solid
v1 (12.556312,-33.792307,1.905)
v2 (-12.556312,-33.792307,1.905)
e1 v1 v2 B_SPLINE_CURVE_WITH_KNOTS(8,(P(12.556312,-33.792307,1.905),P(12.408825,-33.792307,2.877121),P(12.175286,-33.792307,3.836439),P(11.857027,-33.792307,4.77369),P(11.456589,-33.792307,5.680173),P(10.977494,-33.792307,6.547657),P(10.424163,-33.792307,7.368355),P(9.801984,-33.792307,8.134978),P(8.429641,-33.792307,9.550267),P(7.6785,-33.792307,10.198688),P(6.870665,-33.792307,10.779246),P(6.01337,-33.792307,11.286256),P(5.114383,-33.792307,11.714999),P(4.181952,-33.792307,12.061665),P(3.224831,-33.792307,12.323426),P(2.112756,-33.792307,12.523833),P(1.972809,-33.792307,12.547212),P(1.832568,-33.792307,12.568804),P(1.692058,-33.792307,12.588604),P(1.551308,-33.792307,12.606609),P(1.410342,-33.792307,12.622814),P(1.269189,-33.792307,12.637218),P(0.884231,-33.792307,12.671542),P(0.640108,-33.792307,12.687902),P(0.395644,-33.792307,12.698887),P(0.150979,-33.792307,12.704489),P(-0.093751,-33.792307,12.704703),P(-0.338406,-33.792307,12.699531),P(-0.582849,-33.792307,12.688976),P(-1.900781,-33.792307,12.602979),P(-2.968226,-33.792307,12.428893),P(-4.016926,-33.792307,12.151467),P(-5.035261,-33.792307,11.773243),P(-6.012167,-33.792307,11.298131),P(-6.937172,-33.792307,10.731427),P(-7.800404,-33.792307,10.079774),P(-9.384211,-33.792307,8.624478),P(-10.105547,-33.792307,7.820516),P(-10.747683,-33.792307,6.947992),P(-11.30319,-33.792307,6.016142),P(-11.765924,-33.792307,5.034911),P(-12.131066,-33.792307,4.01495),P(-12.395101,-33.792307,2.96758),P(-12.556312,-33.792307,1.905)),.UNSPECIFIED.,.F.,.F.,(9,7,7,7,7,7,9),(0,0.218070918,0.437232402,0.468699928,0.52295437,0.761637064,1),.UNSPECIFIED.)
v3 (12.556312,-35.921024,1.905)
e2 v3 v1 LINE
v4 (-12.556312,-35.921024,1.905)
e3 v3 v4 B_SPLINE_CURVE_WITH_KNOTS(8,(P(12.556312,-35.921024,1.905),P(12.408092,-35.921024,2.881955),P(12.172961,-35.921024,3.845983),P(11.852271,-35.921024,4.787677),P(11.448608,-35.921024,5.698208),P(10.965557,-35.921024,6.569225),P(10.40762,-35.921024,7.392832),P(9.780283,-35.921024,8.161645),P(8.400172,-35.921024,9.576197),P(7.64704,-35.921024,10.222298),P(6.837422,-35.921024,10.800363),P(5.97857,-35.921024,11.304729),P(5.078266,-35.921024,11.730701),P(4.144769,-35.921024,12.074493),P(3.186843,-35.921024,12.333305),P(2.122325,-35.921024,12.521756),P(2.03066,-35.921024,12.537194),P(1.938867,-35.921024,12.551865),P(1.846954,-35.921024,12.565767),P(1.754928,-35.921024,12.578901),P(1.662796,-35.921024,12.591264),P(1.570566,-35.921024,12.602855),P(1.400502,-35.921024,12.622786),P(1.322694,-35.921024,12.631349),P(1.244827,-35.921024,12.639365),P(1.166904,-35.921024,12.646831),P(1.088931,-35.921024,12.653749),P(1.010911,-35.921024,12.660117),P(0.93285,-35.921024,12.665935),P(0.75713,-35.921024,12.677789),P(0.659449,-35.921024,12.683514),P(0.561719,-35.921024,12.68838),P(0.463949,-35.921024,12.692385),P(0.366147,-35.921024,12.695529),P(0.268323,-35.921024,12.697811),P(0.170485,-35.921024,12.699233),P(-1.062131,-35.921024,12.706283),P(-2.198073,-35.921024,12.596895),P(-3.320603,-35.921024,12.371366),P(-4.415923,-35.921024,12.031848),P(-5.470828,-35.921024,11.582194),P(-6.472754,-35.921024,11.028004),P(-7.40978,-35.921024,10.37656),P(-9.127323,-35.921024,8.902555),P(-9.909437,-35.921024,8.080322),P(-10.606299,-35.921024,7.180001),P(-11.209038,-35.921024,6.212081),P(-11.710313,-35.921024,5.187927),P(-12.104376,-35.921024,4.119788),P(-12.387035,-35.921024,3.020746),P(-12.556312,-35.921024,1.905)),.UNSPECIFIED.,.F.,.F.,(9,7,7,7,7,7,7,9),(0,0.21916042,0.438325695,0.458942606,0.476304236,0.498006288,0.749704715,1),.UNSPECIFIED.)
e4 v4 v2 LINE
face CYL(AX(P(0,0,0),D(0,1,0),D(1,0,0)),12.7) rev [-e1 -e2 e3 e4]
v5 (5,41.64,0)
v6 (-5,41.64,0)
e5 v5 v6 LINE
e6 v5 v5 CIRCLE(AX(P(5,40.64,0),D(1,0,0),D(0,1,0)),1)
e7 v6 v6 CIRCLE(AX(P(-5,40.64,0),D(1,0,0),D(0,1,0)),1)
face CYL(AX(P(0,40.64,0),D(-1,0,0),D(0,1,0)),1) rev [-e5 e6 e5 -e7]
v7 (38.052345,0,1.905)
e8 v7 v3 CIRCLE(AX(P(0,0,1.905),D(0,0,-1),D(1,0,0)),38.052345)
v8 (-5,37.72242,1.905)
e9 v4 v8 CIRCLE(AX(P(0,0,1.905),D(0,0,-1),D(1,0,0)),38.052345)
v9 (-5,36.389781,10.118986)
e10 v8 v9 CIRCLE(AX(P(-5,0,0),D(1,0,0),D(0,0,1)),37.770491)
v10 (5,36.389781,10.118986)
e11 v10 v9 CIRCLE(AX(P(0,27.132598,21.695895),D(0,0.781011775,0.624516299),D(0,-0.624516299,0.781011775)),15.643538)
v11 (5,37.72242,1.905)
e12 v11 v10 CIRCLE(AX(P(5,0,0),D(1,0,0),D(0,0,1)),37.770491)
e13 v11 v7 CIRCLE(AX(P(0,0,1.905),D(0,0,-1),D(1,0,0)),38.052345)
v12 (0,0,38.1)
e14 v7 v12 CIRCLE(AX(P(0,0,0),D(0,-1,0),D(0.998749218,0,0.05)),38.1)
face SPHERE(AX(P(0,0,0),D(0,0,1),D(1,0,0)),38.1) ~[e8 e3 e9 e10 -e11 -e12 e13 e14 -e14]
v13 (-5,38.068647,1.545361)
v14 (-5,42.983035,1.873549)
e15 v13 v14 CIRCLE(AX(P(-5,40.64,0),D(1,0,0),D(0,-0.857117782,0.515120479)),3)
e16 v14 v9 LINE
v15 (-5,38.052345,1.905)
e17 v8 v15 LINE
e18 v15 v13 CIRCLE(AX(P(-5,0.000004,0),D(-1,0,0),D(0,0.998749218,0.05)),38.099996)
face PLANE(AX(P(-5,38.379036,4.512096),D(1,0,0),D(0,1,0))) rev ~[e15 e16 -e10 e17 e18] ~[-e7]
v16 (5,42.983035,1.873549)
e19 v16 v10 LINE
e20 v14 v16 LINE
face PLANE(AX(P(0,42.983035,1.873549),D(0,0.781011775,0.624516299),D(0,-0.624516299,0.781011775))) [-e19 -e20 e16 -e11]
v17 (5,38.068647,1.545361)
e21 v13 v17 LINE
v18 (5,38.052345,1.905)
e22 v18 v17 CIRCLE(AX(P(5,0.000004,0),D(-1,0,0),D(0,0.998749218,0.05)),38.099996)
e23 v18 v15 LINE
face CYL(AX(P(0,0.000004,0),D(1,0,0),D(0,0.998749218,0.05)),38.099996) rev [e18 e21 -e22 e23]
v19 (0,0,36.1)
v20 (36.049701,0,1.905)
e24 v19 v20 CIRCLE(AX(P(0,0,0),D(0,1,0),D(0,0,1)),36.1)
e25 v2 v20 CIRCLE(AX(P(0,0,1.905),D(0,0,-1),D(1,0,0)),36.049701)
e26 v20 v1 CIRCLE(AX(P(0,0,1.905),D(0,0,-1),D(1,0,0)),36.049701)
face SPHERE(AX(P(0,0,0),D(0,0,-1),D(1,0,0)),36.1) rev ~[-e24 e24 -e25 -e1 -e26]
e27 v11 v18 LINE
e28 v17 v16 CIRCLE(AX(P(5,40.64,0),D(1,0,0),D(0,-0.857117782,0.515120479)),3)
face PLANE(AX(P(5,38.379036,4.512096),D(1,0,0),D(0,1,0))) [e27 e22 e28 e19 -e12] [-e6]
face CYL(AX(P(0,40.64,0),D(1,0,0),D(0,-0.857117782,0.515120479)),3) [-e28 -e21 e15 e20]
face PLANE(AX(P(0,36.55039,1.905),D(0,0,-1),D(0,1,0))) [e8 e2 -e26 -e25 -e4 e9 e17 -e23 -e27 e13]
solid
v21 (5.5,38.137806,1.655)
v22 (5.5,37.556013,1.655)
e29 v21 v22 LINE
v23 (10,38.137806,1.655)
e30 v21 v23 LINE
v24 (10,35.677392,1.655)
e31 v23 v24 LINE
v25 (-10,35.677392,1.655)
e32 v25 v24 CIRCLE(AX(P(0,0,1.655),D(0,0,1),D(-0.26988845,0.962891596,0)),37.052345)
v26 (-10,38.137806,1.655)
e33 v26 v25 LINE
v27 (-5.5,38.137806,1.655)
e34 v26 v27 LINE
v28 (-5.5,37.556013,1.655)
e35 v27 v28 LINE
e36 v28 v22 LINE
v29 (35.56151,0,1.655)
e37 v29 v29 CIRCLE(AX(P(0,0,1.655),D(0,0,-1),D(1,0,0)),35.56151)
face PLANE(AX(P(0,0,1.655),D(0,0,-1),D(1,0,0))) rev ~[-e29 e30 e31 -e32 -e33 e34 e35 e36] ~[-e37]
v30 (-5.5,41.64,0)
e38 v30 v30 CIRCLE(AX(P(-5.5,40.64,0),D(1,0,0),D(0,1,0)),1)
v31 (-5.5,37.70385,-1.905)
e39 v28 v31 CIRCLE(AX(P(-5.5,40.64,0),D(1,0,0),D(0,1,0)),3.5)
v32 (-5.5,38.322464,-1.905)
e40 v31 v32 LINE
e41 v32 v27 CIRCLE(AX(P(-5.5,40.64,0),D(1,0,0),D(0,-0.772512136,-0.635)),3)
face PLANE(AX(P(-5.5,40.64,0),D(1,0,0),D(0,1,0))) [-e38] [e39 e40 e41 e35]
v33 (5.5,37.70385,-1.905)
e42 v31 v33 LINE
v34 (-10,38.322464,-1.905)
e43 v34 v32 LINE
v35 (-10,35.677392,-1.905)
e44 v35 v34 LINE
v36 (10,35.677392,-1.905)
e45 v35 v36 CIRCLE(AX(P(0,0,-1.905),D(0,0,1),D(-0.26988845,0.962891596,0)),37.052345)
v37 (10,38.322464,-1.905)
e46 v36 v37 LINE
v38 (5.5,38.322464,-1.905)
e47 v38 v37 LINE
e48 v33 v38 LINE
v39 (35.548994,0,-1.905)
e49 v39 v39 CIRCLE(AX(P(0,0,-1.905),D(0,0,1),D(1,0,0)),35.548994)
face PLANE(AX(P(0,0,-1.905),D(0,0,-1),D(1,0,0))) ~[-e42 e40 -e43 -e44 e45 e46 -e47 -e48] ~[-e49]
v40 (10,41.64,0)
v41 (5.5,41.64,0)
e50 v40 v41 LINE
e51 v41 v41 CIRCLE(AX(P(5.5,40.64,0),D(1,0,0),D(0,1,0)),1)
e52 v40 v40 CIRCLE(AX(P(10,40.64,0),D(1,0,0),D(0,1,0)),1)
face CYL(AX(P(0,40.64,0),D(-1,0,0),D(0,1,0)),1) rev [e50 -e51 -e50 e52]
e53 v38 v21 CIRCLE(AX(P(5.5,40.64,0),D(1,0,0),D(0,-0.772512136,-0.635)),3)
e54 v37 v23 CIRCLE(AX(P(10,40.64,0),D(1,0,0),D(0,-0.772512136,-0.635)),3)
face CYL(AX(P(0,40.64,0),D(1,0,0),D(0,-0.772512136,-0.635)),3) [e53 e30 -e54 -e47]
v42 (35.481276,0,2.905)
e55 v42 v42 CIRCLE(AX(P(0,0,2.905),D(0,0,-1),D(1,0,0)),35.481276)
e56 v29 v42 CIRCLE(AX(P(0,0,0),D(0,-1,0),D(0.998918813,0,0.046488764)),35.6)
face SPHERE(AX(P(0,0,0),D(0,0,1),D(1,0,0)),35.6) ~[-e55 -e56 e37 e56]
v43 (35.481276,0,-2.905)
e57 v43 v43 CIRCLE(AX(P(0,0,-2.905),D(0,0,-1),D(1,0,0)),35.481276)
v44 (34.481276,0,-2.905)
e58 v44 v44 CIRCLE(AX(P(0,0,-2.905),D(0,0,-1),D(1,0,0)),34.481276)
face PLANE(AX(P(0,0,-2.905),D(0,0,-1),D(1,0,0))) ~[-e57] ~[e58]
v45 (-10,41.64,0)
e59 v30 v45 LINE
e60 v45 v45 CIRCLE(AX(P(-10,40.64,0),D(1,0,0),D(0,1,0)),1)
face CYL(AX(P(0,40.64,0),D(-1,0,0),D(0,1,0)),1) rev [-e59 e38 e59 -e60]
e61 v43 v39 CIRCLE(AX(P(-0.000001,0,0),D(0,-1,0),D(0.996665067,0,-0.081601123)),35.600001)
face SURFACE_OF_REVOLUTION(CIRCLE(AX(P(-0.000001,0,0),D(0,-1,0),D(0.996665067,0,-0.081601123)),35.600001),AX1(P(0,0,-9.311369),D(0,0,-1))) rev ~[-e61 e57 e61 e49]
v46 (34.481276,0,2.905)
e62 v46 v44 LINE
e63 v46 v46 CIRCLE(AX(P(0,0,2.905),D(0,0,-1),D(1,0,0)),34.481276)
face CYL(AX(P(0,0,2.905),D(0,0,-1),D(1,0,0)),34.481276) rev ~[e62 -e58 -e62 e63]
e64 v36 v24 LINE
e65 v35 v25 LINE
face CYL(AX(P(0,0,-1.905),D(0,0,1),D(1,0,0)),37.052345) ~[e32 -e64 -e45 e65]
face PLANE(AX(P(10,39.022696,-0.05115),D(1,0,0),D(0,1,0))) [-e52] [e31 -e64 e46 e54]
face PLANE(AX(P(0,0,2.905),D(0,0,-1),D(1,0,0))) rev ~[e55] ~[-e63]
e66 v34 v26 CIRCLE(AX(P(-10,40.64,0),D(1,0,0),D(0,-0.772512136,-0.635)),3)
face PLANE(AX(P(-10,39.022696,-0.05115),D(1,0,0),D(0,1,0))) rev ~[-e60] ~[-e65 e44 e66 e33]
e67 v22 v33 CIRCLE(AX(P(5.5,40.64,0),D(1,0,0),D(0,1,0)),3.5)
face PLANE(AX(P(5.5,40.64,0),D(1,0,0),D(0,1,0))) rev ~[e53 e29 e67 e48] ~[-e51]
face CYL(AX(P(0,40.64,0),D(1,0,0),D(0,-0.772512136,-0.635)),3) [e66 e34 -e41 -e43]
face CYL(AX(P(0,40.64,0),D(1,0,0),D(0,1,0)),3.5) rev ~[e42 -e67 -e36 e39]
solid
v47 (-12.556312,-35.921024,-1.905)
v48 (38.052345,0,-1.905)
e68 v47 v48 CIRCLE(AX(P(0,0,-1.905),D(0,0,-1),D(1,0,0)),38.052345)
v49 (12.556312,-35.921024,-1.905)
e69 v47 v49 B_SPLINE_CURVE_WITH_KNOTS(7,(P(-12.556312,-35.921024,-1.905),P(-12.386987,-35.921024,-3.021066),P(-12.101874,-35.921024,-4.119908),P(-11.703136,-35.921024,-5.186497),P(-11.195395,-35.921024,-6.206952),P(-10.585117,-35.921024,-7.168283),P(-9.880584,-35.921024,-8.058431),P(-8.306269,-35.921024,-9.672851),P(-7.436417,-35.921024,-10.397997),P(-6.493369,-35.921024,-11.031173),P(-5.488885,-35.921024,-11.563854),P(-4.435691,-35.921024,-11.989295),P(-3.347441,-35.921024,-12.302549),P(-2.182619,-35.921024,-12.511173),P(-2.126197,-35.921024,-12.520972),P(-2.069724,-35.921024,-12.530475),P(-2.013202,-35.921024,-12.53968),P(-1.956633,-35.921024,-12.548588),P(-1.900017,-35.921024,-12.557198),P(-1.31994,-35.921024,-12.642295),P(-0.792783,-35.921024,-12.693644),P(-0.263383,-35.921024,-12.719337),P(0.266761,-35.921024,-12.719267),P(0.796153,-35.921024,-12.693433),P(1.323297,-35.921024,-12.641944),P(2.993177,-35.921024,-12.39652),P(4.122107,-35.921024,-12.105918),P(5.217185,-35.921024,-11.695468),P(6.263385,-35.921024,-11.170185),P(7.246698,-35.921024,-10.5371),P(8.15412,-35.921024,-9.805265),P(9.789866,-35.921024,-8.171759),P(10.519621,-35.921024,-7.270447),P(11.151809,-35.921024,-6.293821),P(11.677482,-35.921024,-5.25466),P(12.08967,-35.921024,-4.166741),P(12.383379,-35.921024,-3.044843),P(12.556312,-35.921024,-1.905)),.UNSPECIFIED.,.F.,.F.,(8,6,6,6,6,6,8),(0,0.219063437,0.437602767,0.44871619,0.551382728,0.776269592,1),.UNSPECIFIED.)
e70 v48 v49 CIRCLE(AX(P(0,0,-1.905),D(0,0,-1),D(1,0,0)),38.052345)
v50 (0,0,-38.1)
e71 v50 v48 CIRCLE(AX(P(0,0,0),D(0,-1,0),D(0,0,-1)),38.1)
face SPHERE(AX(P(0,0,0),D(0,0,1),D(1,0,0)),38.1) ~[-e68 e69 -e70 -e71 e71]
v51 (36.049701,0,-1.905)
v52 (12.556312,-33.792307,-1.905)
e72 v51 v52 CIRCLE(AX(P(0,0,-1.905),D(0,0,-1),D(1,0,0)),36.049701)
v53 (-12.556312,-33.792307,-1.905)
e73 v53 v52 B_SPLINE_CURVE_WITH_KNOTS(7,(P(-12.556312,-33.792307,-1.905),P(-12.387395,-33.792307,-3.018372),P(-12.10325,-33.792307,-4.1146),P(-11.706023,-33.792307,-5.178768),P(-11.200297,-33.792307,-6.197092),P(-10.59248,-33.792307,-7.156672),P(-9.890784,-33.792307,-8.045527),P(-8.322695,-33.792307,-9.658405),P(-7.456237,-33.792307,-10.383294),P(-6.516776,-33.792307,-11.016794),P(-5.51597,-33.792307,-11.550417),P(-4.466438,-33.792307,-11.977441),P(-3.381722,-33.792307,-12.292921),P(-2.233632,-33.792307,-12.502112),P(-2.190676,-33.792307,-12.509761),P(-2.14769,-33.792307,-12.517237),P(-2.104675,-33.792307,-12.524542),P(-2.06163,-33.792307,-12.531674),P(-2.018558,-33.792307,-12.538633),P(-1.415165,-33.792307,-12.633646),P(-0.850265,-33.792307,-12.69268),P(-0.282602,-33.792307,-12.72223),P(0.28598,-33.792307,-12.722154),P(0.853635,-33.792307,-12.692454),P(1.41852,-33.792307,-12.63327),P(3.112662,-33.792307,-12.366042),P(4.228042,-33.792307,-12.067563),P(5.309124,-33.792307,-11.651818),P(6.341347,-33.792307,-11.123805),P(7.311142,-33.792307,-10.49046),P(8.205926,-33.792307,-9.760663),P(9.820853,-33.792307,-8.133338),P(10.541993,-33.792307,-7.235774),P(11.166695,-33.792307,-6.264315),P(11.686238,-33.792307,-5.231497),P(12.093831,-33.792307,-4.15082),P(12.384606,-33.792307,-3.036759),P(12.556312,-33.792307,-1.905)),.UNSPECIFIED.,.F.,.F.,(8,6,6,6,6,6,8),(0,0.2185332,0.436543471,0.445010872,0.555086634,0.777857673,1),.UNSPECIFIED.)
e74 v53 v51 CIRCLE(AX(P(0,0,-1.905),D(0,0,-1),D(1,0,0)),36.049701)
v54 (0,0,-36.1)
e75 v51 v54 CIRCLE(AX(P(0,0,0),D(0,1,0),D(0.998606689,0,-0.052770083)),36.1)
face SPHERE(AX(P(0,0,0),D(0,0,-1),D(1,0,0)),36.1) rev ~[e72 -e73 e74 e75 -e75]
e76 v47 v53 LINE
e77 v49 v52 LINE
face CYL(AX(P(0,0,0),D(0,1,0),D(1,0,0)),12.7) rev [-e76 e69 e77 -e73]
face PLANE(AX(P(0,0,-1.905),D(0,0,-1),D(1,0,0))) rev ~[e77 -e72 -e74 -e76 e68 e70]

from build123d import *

# Parameters (mm, degrees)
F3_W      = 91.5835574269
F3_H      = 84.7303681076
F4_DEPTH  = 0.25
F2_R      = 12.7
F5_DEPTH  = 65.532
F8_R      = 1
F9_DEPTH  = 10
F10_R     = 1
F11_DEPTH = 5
F12_R     = 3.5
F12_R_2   = 1
F13_DEPTH = 5.5


with BuildPart() as f1:
    # F0 (on Front) → F1 (revolve)
    with BuildSketch(Plane.XZ):
        with BuildLine():
            Line((0, -36.1), (0, -38.1))
            ThreePointArc((0, -38.1), (26.2586128727, -27.6060727015), (38.0523451971, -1.905))
            Line((38.0523451971, -1.905), (36.0497014551, -1.905))
            ThreePointArc((36.0497014551, -1.905), (24.8439077039, -26.1914155784), (0, -36.1))
        make_face()
    revolve(axis=Axis((0, 0, 37.1), (0, 0, -1)))

    # F3 (on Top) → F4 (cut, symmetric)
    with BuildSketch(Plane.XY):
        with Locations((-0.697106123, -1.4025885612)):
            Rectangle(F3_W, F3_H)
    extrude(amount=F4_DEPTH, both=True, mode=Mode.SUBTRACT)


with BuildPart() as f1b:
    # F0 (on Front) → F1, piece 2 (revolve)
    with BuildSketch(Plane.XZ):
        with BuildLine():
            ThreePointArc((38.0523451971, 1.905), (26.2586128727, 27.6060727015), (0, 38.1))
            Line((0, 38.1), (0, 36.1))
            ThreePointArc((0, 36.1), (24.8439077039, 26.1914155784), (36.0497014551, 1.905))
            Line((36.0497014551, 1.905), (38.0523451971, 1.905))
        make_face()
    revolve(axis=Axis((0, 0, 37.1), (0, 0, -1)))


with BuildPart() as f5_tool:
    # F2 (on Front) → F5 (new body)
    with BuildSketch(Plane.XZ):
        Circle(F2_R)
    extrude(amount=F5_DEPTH)


with BuildPart() as f1_1:
    add(f1.part)

    # F5: cut by f5_tool
    add(f5_tool.part, mode=Mode.SUBTRACT)


with BuildPart() as f1b_1:
    add(f1b.part)

    # F5: cut by f5_tool
    add(f5_tool.part, mode=Mode.SUBTRACT)

    # F10 (on Right) → F11 (join, symmetric)
    with BuildSketch(Plane.YZ):
        with BuildLine():
            ThreePointArc((38.0523451971, 1.905), (38.0609207069, 1.7251999722), (38.0686466535, 1.5453614359))
            ThreePointArc((38.0686466535, 1.5453614359), (40.8398975537, -2.9933327526), (42.983035325, 1.873548896))
            Line((42.983035325, 1.873548896), (34.3259377148, 12.7))
            ThreePointArc((34.3259377148, 12.7), (35.8468471037, 7.3867146095), (36.5503895328, 1.905))
            Line((36.5503895328, 1.905), (38.0523451971, 1.905))
        make_face()
        with Locations((40.64, 0)):
            Circle(F10_R, mode=Mode.SUBTRACT)
    extrude(amount=F11_DEPTH, both=True)


with BuildPart() as f7:
    # F6 (on Front) → F7 (revolve)
    with BuildSketch(Plane.XZ):
        with BuildLine():
            Line((37.0523451971, -1.905), (37.0523451971, 1.655))
            Line((37.0523451971, 1.655), (35.5615097402, 1.655))
            ThreePointArc((35.5615097402, 1.655), (35.5268910919, 2.2803528997), (35.4812764004, 2.905))
            Line((35.4812764004, 2.905), (34.4812764004, 2.905))
            Line((34.4812764004, 2.905), (34.4812764004, -2.905))
            Line((34.4812764004, -2.905), (35.4812764004, -2.905))
            ThreePointArc((35.4812764004, -2.905), (35.5186546561, -2.4052383289), (35.5489940083, -1.905))
            Line((35.5489940083, -1.905), (37.0523451971, -1.905))
        make_face()
    revolve(axis=Axis((0, 0, -9.3113686889), (0, 0, -1)))

    # F8 (on Right) → F9 (join, symmetric)
    with BuildSketch(Plane.YZ):
        with BuildLine():
            Line((35.0969918072, -1.905), (38.3224635925, -1.905))
            ThreePointArc((38.3224635925, -1.905), (43.6359723613, 0.1554014481), (38.1378059628, 1.655))
            Line((38.1378059628, 1.655), (35.0969918072, 1.655))
            Line((35.0969918072, 1.655), (35.0969918072, -1.905))
        make_face()
        with Locations((40.64, 0)):
            Circle(F8_R, mode=Mode.SUBTRACT)
    extrude(amount=F9_DEPTH, both=True)

    # F12 (on Right) → F13 (cut, symmetric)
    with BuildSketch(Plane.YZ):
        with Locations((40.64, 0)):
            Circle(F12_R)
        with Locations((40.64, 0)):
            Circle(F12_R_2, mode=Mode.SUBTRACT)
    extrude(amount=F13_DEPTH, both=True, mode=Mode.SUBTRACT)


solid = Compound([f1_1.part, f1b_1.part, f7.part])
